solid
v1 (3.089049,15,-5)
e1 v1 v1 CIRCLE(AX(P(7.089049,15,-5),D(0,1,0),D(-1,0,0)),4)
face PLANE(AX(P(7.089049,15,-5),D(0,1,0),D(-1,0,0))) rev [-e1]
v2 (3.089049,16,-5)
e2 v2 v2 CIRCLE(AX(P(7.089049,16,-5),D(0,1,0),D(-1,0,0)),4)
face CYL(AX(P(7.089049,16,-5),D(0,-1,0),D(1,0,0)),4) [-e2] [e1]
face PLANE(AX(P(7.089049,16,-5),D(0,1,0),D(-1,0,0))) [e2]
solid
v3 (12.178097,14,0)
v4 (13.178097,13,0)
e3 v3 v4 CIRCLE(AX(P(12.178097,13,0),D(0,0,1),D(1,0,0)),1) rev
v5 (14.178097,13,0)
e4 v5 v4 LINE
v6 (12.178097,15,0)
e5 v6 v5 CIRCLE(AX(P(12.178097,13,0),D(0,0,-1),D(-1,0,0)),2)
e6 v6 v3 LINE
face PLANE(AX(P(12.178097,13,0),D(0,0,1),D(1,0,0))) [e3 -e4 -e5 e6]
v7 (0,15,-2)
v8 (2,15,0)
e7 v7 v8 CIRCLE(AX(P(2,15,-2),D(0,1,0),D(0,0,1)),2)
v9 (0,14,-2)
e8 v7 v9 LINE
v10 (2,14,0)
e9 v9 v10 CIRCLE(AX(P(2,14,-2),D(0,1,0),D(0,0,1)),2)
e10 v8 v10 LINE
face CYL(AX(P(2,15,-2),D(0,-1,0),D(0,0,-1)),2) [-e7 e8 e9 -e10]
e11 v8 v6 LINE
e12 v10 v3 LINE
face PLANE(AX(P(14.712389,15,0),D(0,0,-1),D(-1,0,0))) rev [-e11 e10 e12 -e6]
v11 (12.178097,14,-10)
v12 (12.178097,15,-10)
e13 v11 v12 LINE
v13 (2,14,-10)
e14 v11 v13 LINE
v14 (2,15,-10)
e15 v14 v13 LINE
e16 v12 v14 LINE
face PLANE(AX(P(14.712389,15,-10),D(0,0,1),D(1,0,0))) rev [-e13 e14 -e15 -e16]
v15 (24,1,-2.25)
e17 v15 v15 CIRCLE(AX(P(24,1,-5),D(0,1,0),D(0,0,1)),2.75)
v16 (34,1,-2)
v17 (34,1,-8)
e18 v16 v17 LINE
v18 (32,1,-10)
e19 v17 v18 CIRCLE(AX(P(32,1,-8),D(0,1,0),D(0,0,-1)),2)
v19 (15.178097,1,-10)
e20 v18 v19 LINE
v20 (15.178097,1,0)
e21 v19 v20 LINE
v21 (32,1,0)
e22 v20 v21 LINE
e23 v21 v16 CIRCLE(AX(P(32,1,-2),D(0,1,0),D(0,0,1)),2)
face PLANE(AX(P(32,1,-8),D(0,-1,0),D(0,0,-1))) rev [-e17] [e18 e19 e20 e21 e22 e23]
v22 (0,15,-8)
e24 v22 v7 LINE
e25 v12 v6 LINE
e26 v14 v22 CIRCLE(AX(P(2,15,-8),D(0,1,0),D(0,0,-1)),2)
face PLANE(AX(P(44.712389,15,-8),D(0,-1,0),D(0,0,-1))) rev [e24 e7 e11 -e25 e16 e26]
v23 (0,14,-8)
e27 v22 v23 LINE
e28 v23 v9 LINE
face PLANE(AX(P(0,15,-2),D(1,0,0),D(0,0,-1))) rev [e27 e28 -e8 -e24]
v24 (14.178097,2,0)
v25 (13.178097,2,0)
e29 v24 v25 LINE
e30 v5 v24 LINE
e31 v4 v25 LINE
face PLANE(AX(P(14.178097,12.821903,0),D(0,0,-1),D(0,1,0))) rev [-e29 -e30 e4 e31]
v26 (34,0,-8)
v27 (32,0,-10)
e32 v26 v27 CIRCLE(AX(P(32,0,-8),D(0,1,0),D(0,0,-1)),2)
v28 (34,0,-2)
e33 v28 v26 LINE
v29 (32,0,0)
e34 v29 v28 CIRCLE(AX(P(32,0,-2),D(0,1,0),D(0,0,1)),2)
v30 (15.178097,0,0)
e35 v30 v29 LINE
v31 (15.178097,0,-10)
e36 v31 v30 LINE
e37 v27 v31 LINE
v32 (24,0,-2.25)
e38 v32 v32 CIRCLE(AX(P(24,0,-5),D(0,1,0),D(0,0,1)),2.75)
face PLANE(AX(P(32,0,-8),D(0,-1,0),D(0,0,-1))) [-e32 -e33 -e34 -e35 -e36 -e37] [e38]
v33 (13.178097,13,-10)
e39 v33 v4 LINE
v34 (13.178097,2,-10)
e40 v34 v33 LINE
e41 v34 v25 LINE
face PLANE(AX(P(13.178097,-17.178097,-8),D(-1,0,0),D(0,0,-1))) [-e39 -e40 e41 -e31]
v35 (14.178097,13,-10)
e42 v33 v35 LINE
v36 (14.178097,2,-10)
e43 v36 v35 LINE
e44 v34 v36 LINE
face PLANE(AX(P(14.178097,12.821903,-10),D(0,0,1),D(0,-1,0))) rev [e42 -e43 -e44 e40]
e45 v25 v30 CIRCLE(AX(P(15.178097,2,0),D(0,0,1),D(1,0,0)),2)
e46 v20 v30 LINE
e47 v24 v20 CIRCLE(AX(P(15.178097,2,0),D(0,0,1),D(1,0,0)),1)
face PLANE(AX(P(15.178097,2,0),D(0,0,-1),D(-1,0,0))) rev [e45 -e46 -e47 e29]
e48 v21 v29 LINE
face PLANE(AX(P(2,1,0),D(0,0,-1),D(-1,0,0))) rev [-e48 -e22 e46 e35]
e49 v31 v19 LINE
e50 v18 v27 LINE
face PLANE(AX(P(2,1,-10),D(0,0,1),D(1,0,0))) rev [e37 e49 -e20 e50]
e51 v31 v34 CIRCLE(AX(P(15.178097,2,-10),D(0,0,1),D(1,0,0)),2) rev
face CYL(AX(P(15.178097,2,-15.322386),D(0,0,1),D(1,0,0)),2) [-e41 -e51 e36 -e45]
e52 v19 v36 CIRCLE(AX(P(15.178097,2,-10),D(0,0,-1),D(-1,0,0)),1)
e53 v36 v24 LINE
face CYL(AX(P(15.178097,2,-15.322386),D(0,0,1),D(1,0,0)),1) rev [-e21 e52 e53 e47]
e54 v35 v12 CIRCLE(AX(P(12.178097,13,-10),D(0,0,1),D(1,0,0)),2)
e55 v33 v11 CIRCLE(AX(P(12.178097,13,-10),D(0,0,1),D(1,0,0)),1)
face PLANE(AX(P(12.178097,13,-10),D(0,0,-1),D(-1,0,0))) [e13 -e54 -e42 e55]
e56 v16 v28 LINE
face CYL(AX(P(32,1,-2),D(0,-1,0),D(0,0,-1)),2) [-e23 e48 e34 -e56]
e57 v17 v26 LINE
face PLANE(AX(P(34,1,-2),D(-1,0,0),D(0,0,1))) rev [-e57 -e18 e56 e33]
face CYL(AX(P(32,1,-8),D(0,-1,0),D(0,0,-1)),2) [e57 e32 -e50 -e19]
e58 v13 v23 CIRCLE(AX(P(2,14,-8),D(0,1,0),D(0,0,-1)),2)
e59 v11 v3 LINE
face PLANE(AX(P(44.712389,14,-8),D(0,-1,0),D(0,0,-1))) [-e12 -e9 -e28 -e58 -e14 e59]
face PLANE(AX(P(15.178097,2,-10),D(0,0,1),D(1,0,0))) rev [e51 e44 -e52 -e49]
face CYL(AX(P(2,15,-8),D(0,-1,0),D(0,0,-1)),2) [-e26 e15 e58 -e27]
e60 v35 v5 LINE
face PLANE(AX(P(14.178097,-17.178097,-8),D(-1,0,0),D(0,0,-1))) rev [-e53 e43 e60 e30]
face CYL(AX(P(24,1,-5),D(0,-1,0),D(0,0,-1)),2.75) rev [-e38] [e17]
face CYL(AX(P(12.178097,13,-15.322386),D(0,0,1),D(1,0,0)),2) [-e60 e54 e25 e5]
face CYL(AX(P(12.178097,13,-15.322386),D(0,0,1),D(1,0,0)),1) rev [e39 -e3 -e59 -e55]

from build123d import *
from build123d.topology import SkipClean

# Parameters (mm, degrees)
SKETCH2_R           = 2.75
BASE_FLANGE1_DEPTH  = 1
JOG1_START          = -10
JOG1_DEPTH          = 10
JOG1_START_2        = -8
JOG1_2_DEPTH        = 6
JOG1_START_3        = 13
JOG1_3_DEPTH        = 1.976704963
JOG1_START_4        = 1
JOG1_4_OUTLINE_W    = 1
JOG1_4_OUTLINE_H    = 2
JOG1_4_DEPTH        = 12.160683996
JOG1_START_5        = 14
JOG1_5_DEPTH        = 1
JOG1_6_DEPTH        = 10
JOG1_7_DEPTH        = 10
SKETCH8_R           = 4
BOSS_EXTRUDE2_DEPTH = 1


with BuildPart() as part:
    # Base-Flange1: sheet metal written as solids
    # Sketch2 → Base-Flange1 (new body)
    with BuildSketch(Plane(origin=(0, 0, 0), x_dir=(1, 0, 0), z_dir=(0, 1, 0))):
        with BuildLine():
            Line((2, 0), (32, 0))
            ThreePointArc((32, 0), (33.414213562, 0.585786438), (34, 2))
            Line((34, 2), (34, 8))
            ThreePointArc((34, 8), (33.414213562, 9.414213562), (32, 10))
            Line((32, 10), (2, 10))
            ThreePointArc((2, 10), (0.585786438, 9.414213562), (0, 8))
            Line((0, 8), (0, 2))
            ThreePointArc((0, 2), (0.585786438, 0.585786438), (2, 0))
        make_face()
        with Locations(Location((24, 5, 0), (0, 0, 270))):
            Circle(SKETCH2_R, mode=Mode.SUBTRACT)
    extrude(amount=BASE_FLANGE1_DEPTH)

    # Jog1: read off the stored shape, not the designer's step
    # Jog1 outline → Jog1 (cut)
    with BuildSketch(Plane.XY.offset(JOG1_START)):
        with BuildLine():
            ThreePointArc((15.178097245, 0), (14.178097245, 0.267949193), (13.446046438, 1))
            Line((13.446046438, 1), (0, 1))
            Line((0, 1), (0, 0))
            Line((0, 0), (15.178097245, 0))
        make_face()
    extrude(amount=JOG1_DEPTH, mode=Mode.SUBTRACT)

    # Jog1 2 outline → Jog1 2 (add)
    with BuildSketch(Plane.XY.offset(JOG1_START_2)):
        with BuildLine():
            Line((14.178097245, 2), (14.178097245, 13))
            ThreePointArc((14.178097245, 13), (13.592310807, 14.414213562), (12.178097245, 15))
            Line((12.178097245, 15), (0, 15))
            Line((0, 15), (0, 14))
            Line((0, 14), (12.178097245, 14))
            ThreePointArc((12.178097245, 14), (12.885204026, 13.707106781), (13.178097245, 13))
            Line((13.178097245, 13), (13.178097245, 2))
            ThreePointArc((13.178097245, 2), (13.246245593, 1.48236191), (13.446046438, 1))
            Line((13.446046438, 1), (15.178097245, 1))
            ThreePointArc((15.178097245, 1), (14.470990464, 1.292893219), (14.178097245, 2))
        make_face()
    extrude(amount=JOG1_2_DEPTH)

    # Jog1 3 outline → Jog1 3 (add)
    with BuildSketch(Plane(origin=(0, 0, 0), x_dir=(1, 0, 0), z_dir=(0, 1, 0)).offset(JOG1_START_3)):
        with BuildLine():
            Line((14.178097245, 0), (14.178097245, 2))
            Line((14.178097245, 2), (0, 2))
            ThreePointArc((0, 2), (0.585786438, 0.585786438), (2, 0))
            Line((2, 0), (14.178097245, 0))
        make_face()
        with BuildLine():
            Line((14.178097245, 8), (14.178097245, 10))
            Line((14.178097245, 10), (2, 10))
            ThreePointArc((2, 10), (0.585786438, 9.414213562), (0, 8))
            Line((0, 8), (14.178097245, 8))
        make_face()
    extrude(amount=JOG1_3_DEPTH)

    # Jog1 4 outline → Jog1 4 (add)
    with BuildSketch(Plane(origin=(0, 0, 0), x_dir=(1, 0, 0), z_dir=(0, 1, 0)).offset(JOG1_START_4)):
        with Locations((13.678097245, 1)):
            Rectangle(JOG1_4_OUTLINE_W, JOG1_4_OUTLINE_H)
        with Locations((13.678097245, 9)):
            Rectangle(JOG1_4_OUTLINE_W, JOG1_4_OUTLINE_H)
    extrude(amount=JOG1_4_DEPTH)

    # Jog1 5 outline → Jog1 5 (add)
    with BuildSketch(Plane(origin=(0, 0, 0), x_dir=(1, 0, 0), z_dir=(0, 1, 0)).offset(JOG1_START_5)):
        with BuildLine():
            Line((2, 0), (13.178097245, 0))
            Line((13.178097245, 0), (13.178097245, 2))
            Line((13.178097245, 2), (0, 2))
            ThreePointArc((0, 2), (0.585786438, 0.585786438), (2, 0))
        make_face()
        with BuildLine():
            Line((0, 8), (13.178097245, 8))
            Line((13.178097245, 8), (13.178097245, 10))
            Line((13.178097245, 10), (2, 10))
            ThreePointArc((2, 10), (0.585786438, 9.414213562), (0, 8))
        make_face()
    extrude(amount=JOG1_5_DEPTH)

    # Jog1 6 outline → Jog1 6 (cut)
    with SkipClean():  # the faces are left unmerged after this step: merging them gives an invalid solid
        with BuildSketch(Plane.XY.offset(JOG1_START)):
            with BuildLine():
                Line((14.178097245, 13), (14.178097245, 14.976704963))
                Line((14.178097245, 14.976704963), (13.178097245, 14.976704963))
                Line((13.178097245, 14.976704963), (13.178097245, 15))
                Line((13.178097245, 15), (13.178097236, 16))
                Line((13.178097236, 16), (-1, 16))
                Line((-1, 16), (-1, 15.000000008))
                Line((-1, 15.000000008), (12.178097245, 15))
                ThreePointArc((12.178097245, 15), (13.592310807, 14.414213562), (14.178097245, 13))
            make_face()
            with BuildLine():
                Line((14.178097254, -1), (14.178097249, 0.267949191))
                ThreePointArc((14.178097249, 0.267949191), (13.763883685, 0.585786436), (13.446046438, 1))
                ThreePointArc((13.446046438, 1), (13.246245593, 1.48236191), (13.178097245, 2))
                Line((13.178097245, 2), (13.178097245, 13))
                ThreePointArc((13.178097245, 13), (12.885204026, 13.707106781), (12.178097245, 14))
                Line((12.178097245, 14), (-1, 14))
                Line((-1, 14), (-1, -1))
                Line((-1, -1), (14.178097254, -1))
            make_face()
        extrude(amount=JOG1_6_DEPTH, mode=Mode.SUBTRACT)
    add(part.part.scale(1), mode=Mode.REPLACE)  # the faces are merged on a copy

    # Jog1 7 outline → Jog1 7 (add)
    with SkipClean():  # the faces are left unmerged after this step: merging them gives an invalid solid
        with BuildSketch(Plane.XY.offset(JOG1_START)):
            with BuildLine():
                ThreePointArc((15.178097245, 1), (14.470990464, 1.292893219), (14.178097245, 2))
                Line((14.178097245, 2), (14.178097245, 1))
                Line((14.178097245, 1), (14.178097249, 0.267949191))
                ThreePointArc((14.178097249, 0.267949191), (14.660459157, 0.068148347), (15.178097245, 0))
                Line((15.178097245, 0), (17, -1e-09))
                Line((17, -1e-09), (17, 0.999999999))
                Line((17, 0.999999999), (15.178097245, 1))
            make_face()
        extrude(amount=JOG1_7_DEPTH)
    add(part.part.scale(1), mode=Mode.REPLACE)  # the faces are merged on a copy


with BuildPart() as body_2:
    # Sketch8 → Boss-Extrude2 (new body)
    with BuildSketch(Plane(origin=(0, 15, 0), x_dir=(1, 0, 0), z_dir=(0, 1, 0))):
        with Locations(Location((7.089048623, 5, 0), (0, 0, 180))):
            Circle(SKETCH8_R)
    extrude(amount=BOSS_EXTRUDE2_DEPTH)


solid = Compound([part.part, body_2.part])
